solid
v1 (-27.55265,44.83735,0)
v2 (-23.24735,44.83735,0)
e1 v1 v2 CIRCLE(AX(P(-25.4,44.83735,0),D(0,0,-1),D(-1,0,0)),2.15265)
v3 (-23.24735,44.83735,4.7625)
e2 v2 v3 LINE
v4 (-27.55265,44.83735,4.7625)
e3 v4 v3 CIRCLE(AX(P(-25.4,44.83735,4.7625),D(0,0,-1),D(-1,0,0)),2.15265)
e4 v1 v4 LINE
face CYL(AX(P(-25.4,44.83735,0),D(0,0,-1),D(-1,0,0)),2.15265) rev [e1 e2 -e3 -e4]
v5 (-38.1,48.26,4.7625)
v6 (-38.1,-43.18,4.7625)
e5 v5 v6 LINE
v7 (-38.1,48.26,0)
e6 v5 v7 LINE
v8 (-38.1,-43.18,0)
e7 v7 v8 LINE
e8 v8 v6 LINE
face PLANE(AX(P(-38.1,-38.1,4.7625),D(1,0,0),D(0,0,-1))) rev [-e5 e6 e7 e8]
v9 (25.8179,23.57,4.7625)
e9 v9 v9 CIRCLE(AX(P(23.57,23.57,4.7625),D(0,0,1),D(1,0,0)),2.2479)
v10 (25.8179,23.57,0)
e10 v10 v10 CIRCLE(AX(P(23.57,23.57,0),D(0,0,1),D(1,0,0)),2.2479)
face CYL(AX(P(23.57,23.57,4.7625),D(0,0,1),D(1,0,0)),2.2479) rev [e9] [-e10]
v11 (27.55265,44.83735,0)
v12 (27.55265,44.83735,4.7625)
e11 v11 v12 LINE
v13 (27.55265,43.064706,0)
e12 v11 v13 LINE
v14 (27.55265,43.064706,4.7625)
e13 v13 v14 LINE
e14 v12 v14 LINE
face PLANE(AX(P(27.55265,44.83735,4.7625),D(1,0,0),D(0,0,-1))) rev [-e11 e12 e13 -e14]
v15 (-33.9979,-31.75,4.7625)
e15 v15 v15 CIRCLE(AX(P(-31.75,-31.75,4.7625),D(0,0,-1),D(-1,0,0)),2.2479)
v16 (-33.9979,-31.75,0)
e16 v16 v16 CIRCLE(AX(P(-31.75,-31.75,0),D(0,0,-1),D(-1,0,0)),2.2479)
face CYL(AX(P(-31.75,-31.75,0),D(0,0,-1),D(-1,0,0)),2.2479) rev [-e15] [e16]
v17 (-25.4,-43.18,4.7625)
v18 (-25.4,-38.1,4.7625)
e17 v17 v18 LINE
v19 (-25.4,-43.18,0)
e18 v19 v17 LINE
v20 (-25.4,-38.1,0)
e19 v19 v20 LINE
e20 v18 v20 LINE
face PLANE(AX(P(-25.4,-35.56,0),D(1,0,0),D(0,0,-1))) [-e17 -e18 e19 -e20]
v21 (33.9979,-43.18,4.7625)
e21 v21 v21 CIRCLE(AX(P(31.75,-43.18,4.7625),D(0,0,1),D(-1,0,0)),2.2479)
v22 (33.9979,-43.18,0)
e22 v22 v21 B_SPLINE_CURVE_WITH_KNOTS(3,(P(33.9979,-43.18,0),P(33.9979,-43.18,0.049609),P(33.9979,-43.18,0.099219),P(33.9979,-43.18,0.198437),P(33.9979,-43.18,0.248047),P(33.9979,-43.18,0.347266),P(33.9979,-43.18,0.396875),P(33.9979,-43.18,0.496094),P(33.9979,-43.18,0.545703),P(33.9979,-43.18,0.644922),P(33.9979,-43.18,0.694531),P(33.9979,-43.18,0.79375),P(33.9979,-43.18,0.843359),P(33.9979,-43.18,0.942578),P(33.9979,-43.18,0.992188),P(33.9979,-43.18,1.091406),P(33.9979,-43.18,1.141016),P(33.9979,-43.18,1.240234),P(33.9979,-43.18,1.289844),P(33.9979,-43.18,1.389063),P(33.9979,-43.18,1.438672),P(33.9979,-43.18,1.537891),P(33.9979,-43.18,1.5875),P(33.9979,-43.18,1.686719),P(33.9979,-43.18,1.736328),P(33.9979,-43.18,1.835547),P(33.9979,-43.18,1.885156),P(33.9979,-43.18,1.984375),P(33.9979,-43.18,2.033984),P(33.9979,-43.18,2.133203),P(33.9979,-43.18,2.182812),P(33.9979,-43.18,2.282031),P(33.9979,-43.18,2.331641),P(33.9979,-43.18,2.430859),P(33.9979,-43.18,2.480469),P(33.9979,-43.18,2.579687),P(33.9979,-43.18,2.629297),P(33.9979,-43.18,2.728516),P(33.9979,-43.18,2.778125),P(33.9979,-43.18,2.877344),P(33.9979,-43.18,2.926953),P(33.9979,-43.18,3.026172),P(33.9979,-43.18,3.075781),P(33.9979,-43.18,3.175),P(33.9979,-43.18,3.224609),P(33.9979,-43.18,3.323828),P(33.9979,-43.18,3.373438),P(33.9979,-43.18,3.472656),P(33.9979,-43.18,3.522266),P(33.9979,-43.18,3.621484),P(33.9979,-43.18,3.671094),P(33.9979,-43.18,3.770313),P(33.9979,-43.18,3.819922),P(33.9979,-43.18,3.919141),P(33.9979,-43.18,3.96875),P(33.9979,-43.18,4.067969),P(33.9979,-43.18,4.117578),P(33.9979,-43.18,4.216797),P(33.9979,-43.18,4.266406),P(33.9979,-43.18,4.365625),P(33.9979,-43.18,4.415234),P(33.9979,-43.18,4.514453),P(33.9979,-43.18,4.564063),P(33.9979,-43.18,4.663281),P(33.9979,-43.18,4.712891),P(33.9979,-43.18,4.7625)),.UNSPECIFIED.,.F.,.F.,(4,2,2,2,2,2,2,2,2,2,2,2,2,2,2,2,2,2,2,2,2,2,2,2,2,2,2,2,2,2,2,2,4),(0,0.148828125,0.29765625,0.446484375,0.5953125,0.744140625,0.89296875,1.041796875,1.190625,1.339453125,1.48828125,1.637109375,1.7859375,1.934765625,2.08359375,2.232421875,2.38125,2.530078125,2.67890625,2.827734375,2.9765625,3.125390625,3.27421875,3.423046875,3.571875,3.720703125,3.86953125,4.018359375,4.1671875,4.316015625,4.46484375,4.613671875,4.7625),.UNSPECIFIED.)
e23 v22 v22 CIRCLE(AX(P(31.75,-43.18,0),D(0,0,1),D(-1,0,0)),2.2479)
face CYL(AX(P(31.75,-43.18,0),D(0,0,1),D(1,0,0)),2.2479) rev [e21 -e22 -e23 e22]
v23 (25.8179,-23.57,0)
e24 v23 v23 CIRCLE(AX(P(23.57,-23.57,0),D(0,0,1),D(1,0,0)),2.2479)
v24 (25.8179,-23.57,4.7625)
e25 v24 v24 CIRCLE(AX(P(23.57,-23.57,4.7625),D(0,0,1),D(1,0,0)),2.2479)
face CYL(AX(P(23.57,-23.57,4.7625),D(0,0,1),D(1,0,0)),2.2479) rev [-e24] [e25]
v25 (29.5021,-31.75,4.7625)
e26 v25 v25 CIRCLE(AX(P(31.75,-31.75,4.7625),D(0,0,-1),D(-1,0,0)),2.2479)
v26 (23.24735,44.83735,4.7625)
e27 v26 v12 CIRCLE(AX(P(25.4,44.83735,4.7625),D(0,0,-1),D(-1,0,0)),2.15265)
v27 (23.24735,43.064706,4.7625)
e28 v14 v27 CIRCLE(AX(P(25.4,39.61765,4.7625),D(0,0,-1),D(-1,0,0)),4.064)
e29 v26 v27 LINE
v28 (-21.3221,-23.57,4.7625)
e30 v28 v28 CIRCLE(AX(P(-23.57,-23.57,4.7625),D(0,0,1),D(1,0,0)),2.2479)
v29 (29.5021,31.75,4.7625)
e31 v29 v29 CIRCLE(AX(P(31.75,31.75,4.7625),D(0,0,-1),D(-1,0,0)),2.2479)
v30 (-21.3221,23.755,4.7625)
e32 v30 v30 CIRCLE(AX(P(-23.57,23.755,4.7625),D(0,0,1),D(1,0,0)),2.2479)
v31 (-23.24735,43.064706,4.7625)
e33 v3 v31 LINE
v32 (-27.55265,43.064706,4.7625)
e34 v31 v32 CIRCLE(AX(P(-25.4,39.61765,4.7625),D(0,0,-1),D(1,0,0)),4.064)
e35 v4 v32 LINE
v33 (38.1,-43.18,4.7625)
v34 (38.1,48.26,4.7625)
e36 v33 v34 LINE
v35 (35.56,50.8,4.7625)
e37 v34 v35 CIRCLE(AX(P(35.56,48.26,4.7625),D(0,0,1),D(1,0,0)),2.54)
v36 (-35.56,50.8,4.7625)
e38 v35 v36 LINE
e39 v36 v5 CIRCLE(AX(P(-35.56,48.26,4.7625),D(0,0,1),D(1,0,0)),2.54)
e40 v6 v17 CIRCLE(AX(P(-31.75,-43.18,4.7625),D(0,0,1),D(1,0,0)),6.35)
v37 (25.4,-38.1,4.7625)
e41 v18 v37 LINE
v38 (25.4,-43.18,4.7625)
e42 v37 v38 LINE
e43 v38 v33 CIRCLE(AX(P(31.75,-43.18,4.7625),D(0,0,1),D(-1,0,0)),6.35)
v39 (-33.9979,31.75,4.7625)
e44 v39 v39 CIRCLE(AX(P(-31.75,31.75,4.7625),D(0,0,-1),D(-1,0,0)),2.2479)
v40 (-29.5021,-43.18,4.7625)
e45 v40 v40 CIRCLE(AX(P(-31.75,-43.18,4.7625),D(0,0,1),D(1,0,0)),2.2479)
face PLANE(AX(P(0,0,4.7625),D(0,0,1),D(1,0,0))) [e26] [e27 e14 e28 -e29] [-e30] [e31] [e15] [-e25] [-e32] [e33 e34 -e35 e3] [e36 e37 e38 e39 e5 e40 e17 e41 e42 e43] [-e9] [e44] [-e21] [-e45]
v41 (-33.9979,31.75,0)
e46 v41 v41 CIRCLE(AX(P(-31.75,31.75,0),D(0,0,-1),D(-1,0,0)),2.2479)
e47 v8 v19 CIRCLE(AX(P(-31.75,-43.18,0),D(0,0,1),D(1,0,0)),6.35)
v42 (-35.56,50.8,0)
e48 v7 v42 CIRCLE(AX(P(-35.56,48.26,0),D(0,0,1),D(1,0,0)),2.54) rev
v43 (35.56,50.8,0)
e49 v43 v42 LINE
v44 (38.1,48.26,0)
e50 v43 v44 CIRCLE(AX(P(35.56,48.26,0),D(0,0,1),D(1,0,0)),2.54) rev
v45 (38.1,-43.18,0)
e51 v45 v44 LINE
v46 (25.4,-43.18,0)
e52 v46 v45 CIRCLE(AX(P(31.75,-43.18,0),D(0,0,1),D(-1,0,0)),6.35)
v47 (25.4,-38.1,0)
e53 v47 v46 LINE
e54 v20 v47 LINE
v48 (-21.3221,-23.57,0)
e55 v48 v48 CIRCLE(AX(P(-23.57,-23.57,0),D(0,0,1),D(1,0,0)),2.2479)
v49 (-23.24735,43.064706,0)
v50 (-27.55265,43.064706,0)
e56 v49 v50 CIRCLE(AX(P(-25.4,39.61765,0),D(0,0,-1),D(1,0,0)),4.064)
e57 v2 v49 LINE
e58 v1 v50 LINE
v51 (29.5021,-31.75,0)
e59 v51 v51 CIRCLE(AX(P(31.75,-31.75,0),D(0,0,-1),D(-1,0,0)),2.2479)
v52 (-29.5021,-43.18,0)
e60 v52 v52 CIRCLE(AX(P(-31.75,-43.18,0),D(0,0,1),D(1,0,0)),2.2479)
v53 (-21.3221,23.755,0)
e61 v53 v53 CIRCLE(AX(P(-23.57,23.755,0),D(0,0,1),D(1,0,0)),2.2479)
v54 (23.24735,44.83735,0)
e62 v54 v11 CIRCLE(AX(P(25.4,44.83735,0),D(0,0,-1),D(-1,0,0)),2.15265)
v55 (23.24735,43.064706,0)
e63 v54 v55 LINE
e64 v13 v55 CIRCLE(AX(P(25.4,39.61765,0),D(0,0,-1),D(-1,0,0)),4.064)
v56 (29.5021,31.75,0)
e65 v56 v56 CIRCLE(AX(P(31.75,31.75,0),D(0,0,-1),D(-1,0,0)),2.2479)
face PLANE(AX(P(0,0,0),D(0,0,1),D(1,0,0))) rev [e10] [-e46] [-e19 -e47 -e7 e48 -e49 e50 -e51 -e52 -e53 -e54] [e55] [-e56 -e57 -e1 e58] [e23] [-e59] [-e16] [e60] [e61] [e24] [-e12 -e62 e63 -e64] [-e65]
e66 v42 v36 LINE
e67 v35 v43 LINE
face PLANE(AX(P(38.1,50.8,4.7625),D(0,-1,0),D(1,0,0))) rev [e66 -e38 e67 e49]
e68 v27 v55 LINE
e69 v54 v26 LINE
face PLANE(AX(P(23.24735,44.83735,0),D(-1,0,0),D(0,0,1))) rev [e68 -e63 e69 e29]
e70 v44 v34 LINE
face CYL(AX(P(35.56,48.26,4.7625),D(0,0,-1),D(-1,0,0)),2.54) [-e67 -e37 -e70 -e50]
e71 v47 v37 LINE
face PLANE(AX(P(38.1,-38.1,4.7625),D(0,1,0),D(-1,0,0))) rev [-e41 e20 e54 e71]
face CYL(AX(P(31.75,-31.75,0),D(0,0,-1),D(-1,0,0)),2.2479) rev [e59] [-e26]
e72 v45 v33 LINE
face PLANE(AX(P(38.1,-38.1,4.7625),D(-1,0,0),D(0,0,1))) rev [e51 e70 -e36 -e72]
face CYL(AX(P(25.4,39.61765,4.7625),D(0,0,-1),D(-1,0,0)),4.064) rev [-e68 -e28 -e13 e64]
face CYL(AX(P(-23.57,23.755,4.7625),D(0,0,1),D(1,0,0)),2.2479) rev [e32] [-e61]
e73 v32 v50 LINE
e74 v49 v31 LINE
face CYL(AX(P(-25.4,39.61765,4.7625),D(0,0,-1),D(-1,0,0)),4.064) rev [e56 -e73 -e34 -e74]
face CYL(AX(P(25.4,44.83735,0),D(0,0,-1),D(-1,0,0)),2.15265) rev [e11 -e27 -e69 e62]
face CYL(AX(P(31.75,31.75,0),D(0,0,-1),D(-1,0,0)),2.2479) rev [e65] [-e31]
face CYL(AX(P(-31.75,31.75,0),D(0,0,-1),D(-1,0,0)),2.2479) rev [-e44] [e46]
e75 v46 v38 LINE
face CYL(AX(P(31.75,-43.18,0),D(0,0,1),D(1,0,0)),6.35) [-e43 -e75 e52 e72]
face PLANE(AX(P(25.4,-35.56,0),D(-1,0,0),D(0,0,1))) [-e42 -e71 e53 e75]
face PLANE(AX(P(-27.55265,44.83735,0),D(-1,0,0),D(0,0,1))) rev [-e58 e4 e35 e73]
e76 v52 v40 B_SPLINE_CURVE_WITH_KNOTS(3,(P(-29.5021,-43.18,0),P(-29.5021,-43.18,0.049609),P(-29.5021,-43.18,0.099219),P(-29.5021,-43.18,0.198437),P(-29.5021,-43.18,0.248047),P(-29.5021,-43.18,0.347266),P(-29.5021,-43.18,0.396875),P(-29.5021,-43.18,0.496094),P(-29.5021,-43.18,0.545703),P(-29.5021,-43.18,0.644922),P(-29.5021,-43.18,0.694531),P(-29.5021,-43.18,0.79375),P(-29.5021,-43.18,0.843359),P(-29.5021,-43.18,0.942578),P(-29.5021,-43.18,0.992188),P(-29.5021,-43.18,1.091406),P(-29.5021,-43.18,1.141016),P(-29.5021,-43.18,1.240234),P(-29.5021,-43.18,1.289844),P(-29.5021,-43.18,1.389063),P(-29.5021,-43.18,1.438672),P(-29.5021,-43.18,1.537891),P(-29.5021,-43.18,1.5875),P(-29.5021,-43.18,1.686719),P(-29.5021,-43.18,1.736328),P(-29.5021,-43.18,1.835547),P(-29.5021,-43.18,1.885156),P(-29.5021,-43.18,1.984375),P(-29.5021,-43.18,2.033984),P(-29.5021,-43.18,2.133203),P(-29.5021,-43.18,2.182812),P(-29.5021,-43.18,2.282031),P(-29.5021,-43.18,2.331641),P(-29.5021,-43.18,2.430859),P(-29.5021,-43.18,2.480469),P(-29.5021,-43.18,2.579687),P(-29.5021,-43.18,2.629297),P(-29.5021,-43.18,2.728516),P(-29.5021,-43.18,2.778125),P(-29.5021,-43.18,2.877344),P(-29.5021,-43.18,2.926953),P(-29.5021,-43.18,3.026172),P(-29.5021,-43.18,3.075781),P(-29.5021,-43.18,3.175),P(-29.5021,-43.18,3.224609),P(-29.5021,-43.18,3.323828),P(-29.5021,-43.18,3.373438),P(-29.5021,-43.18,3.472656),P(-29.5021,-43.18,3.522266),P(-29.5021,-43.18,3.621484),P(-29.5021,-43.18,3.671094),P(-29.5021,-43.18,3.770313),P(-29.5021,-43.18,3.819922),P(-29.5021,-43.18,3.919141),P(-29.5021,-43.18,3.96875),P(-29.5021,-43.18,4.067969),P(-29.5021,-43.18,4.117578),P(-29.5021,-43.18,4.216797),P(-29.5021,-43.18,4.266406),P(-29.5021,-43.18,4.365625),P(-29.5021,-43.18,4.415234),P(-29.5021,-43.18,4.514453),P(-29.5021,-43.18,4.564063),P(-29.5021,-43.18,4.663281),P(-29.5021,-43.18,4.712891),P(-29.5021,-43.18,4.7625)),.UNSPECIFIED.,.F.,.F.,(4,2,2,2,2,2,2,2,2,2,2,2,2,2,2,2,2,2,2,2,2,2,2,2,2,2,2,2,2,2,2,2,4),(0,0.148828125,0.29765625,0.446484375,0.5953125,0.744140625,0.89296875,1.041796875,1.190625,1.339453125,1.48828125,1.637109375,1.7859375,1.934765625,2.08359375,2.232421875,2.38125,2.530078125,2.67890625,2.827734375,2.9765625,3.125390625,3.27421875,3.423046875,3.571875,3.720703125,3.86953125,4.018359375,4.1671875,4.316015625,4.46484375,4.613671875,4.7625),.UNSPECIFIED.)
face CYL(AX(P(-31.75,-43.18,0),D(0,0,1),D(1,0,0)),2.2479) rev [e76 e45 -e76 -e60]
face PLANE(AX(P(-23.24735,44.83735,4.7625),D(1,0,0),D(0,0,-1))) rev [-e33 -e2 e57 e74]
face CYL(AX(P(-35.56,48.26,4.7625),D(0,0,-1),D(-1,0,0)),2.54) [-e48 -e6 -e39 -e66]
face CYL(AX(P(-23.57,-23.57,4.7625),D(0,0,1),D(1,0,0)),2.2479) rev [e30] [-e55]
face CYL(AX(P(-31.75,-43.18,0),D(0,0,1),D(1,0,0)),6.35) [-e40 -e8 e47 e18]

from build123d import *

# Parameters (mm, degrees)
SKETCH1_W                 = 76.2
SKETCH1_H                 = 88.9
BOSS_EXTRUDE1_DEPTH       = 4.7625
F_8_CLEARANCE_HOLE1_D     = 4.4958
FILLET1_R                 = 2.54
F_8_CLEARANCE_SLOT1_DEPTH = 4.7625
SKETCH6_R                 = 4.064
CUT_EXTRUDE1_DEPTH        = 64.678343306
F_8_CLEARANCE_HOLE2_D     = 4.4958
SKETCH9_R                 = 2.2479
BOSS_EXTRUDE2_DEPTH       = 4.7625


# Read off the part's stored shape, not the designer's step: #8 Clearance Slot1
with BuildPart() as part:
    # Sketch1 → Boss-Extrude1 (new body)
    with BuildSketch(Plane.XY):
        with Locations((0, 6.35)):
            Rectangle(SKETCH1_W, SKETCH1_H)
    extrude(amount=BOSS_EXTRUDE1_DEPTH)

    # #8 Clearance Hole1 (through all)
    with Locations(Plane.XY.offset(4.7625)):
        with Locations((23.57, 23.57), (-23.57, 23.755), (23.57, -23.57), (-23.57, -23.57)):
            Hole(F_8_CLEARANCE_HOLE1_D / 2)

    # Fillet1
    fillet1_edges = [part.edges().sort_by_distance(p)[0] for p in [
        (-38.1, 50.8, 2.38125),
        (38.1, 50.8, 2.38125),
        (38.1, -38.1, 2.38125),
        (-38.1, -38.1, 2.38125),
    ]]
    fillet(fillet1_edges, radius=FILLET1_R)

    # #8 Clearance Slot1 outline → #8 Clearance Slot1 (cut)
    with BuildSketch(Plane.XY):
        with BuildLine():
            ThreePointArc((-27.55265, 39.61765), (-25.4, 37.465), (-23.24735, 39.61765))
            Line((-23.24735, 39.61765), (-23.24735, 44.83735))
            ThreePointArc((-23.24735, 44.83735), (-25.4, 46.99), (-27.55265, 44.83735))
            Line((-27.55265, 44.83735), (-27.55265, 39.61765))
        make_face()
        with BuildLine():
            ThreePointArc((23.24735, 39.61765), (25.4, 37.465), (27.55265, 39.61765))
            Line((27.55265, 39.61765), (27.55265, 44.83735))
            ThreePointArc((27.55265, 44.83735), (25.4, 46.99), (23.24735, 44.83735))
            Line((23.24735, 44.83735), (23.24735, 39.61765))
        make_face()
    extrude(amount=F_8_CLEARANCE_SLOT1_DEPTH, mode=Mode.SUBTRACT)

    # Sketch6 → Cut-Extrude1 (cut, through all)
    with BuildSketch(Plane(origin=(0, 0, 0), x_dir=(-1, 0, 0), z_dir=(0, 0, -1))):
        with Locations((-25.4, 39.61765)):
            Circle(SKETCH6_R)
        with Locations((25.4, 39.61765)):
            Circle(SKETCH6_R)
    extrude(amount=-CUT_EXTRUDE1_DEPTH, mode=Mode.SUBTRACT)

    # #8 Clearance Hole2 (through all)
    with Locations(Plane(origin=(0, 0, 0), x_dir=(-1, 0, 0), z_dir=(0, 0, -1))):
        with Locations((31.75, 31.75), (31.75, -31.75), (-31.75, -31.75), (-31.75, 31.75)):
            Hole(F_8_CLEARANCE_HOLE2_D / 2)

    # Sketch9 → Boss-Extrude2 (add, through all)
    # profile 1 of 2: a face of its own
    with BuildSketch(Plane.XY.offset(4.7625)):
        with BuildLine():
            Line((-38.1, -43.18), (-38.1, -35.56))
            Line((-38.1, -35.56), (-25.4, -35.56))
            Line((-25.4, -35.56), (-25.4, -43.18))
            ThreePointArc((-25.4, -43.18), (-31.75, -49.53), (-38.1, -43.18))
        make_face()
        with Locations((-31.75, -43.18)):
            Circle(SKETCH9_R, mode=Mode.SUBTRACT)
    # profile 2 of 2: a face of its own
    with BuildSketch(Plane.XY.offset(4.7625)):
        with BuildLine():
            Line((25.4, -35.56), (25.4, -43.18))
            ThreePointArc((25.4, -43.18), (31.75, -49.53), (38.1, -43.18))
            Line((38.1, -43.18), (38.1, -35.56))
            Line((38.1, -35.56), (25.4, -35.56))
        make_face()
        with Locations((31.75, -43.18)):
            Circle(SKETCH9_R, mode=Mode.SUBTRACT)
    extrude(amount=-BOSS_EXTRUDE2_DEPTH)


solid = part.part
